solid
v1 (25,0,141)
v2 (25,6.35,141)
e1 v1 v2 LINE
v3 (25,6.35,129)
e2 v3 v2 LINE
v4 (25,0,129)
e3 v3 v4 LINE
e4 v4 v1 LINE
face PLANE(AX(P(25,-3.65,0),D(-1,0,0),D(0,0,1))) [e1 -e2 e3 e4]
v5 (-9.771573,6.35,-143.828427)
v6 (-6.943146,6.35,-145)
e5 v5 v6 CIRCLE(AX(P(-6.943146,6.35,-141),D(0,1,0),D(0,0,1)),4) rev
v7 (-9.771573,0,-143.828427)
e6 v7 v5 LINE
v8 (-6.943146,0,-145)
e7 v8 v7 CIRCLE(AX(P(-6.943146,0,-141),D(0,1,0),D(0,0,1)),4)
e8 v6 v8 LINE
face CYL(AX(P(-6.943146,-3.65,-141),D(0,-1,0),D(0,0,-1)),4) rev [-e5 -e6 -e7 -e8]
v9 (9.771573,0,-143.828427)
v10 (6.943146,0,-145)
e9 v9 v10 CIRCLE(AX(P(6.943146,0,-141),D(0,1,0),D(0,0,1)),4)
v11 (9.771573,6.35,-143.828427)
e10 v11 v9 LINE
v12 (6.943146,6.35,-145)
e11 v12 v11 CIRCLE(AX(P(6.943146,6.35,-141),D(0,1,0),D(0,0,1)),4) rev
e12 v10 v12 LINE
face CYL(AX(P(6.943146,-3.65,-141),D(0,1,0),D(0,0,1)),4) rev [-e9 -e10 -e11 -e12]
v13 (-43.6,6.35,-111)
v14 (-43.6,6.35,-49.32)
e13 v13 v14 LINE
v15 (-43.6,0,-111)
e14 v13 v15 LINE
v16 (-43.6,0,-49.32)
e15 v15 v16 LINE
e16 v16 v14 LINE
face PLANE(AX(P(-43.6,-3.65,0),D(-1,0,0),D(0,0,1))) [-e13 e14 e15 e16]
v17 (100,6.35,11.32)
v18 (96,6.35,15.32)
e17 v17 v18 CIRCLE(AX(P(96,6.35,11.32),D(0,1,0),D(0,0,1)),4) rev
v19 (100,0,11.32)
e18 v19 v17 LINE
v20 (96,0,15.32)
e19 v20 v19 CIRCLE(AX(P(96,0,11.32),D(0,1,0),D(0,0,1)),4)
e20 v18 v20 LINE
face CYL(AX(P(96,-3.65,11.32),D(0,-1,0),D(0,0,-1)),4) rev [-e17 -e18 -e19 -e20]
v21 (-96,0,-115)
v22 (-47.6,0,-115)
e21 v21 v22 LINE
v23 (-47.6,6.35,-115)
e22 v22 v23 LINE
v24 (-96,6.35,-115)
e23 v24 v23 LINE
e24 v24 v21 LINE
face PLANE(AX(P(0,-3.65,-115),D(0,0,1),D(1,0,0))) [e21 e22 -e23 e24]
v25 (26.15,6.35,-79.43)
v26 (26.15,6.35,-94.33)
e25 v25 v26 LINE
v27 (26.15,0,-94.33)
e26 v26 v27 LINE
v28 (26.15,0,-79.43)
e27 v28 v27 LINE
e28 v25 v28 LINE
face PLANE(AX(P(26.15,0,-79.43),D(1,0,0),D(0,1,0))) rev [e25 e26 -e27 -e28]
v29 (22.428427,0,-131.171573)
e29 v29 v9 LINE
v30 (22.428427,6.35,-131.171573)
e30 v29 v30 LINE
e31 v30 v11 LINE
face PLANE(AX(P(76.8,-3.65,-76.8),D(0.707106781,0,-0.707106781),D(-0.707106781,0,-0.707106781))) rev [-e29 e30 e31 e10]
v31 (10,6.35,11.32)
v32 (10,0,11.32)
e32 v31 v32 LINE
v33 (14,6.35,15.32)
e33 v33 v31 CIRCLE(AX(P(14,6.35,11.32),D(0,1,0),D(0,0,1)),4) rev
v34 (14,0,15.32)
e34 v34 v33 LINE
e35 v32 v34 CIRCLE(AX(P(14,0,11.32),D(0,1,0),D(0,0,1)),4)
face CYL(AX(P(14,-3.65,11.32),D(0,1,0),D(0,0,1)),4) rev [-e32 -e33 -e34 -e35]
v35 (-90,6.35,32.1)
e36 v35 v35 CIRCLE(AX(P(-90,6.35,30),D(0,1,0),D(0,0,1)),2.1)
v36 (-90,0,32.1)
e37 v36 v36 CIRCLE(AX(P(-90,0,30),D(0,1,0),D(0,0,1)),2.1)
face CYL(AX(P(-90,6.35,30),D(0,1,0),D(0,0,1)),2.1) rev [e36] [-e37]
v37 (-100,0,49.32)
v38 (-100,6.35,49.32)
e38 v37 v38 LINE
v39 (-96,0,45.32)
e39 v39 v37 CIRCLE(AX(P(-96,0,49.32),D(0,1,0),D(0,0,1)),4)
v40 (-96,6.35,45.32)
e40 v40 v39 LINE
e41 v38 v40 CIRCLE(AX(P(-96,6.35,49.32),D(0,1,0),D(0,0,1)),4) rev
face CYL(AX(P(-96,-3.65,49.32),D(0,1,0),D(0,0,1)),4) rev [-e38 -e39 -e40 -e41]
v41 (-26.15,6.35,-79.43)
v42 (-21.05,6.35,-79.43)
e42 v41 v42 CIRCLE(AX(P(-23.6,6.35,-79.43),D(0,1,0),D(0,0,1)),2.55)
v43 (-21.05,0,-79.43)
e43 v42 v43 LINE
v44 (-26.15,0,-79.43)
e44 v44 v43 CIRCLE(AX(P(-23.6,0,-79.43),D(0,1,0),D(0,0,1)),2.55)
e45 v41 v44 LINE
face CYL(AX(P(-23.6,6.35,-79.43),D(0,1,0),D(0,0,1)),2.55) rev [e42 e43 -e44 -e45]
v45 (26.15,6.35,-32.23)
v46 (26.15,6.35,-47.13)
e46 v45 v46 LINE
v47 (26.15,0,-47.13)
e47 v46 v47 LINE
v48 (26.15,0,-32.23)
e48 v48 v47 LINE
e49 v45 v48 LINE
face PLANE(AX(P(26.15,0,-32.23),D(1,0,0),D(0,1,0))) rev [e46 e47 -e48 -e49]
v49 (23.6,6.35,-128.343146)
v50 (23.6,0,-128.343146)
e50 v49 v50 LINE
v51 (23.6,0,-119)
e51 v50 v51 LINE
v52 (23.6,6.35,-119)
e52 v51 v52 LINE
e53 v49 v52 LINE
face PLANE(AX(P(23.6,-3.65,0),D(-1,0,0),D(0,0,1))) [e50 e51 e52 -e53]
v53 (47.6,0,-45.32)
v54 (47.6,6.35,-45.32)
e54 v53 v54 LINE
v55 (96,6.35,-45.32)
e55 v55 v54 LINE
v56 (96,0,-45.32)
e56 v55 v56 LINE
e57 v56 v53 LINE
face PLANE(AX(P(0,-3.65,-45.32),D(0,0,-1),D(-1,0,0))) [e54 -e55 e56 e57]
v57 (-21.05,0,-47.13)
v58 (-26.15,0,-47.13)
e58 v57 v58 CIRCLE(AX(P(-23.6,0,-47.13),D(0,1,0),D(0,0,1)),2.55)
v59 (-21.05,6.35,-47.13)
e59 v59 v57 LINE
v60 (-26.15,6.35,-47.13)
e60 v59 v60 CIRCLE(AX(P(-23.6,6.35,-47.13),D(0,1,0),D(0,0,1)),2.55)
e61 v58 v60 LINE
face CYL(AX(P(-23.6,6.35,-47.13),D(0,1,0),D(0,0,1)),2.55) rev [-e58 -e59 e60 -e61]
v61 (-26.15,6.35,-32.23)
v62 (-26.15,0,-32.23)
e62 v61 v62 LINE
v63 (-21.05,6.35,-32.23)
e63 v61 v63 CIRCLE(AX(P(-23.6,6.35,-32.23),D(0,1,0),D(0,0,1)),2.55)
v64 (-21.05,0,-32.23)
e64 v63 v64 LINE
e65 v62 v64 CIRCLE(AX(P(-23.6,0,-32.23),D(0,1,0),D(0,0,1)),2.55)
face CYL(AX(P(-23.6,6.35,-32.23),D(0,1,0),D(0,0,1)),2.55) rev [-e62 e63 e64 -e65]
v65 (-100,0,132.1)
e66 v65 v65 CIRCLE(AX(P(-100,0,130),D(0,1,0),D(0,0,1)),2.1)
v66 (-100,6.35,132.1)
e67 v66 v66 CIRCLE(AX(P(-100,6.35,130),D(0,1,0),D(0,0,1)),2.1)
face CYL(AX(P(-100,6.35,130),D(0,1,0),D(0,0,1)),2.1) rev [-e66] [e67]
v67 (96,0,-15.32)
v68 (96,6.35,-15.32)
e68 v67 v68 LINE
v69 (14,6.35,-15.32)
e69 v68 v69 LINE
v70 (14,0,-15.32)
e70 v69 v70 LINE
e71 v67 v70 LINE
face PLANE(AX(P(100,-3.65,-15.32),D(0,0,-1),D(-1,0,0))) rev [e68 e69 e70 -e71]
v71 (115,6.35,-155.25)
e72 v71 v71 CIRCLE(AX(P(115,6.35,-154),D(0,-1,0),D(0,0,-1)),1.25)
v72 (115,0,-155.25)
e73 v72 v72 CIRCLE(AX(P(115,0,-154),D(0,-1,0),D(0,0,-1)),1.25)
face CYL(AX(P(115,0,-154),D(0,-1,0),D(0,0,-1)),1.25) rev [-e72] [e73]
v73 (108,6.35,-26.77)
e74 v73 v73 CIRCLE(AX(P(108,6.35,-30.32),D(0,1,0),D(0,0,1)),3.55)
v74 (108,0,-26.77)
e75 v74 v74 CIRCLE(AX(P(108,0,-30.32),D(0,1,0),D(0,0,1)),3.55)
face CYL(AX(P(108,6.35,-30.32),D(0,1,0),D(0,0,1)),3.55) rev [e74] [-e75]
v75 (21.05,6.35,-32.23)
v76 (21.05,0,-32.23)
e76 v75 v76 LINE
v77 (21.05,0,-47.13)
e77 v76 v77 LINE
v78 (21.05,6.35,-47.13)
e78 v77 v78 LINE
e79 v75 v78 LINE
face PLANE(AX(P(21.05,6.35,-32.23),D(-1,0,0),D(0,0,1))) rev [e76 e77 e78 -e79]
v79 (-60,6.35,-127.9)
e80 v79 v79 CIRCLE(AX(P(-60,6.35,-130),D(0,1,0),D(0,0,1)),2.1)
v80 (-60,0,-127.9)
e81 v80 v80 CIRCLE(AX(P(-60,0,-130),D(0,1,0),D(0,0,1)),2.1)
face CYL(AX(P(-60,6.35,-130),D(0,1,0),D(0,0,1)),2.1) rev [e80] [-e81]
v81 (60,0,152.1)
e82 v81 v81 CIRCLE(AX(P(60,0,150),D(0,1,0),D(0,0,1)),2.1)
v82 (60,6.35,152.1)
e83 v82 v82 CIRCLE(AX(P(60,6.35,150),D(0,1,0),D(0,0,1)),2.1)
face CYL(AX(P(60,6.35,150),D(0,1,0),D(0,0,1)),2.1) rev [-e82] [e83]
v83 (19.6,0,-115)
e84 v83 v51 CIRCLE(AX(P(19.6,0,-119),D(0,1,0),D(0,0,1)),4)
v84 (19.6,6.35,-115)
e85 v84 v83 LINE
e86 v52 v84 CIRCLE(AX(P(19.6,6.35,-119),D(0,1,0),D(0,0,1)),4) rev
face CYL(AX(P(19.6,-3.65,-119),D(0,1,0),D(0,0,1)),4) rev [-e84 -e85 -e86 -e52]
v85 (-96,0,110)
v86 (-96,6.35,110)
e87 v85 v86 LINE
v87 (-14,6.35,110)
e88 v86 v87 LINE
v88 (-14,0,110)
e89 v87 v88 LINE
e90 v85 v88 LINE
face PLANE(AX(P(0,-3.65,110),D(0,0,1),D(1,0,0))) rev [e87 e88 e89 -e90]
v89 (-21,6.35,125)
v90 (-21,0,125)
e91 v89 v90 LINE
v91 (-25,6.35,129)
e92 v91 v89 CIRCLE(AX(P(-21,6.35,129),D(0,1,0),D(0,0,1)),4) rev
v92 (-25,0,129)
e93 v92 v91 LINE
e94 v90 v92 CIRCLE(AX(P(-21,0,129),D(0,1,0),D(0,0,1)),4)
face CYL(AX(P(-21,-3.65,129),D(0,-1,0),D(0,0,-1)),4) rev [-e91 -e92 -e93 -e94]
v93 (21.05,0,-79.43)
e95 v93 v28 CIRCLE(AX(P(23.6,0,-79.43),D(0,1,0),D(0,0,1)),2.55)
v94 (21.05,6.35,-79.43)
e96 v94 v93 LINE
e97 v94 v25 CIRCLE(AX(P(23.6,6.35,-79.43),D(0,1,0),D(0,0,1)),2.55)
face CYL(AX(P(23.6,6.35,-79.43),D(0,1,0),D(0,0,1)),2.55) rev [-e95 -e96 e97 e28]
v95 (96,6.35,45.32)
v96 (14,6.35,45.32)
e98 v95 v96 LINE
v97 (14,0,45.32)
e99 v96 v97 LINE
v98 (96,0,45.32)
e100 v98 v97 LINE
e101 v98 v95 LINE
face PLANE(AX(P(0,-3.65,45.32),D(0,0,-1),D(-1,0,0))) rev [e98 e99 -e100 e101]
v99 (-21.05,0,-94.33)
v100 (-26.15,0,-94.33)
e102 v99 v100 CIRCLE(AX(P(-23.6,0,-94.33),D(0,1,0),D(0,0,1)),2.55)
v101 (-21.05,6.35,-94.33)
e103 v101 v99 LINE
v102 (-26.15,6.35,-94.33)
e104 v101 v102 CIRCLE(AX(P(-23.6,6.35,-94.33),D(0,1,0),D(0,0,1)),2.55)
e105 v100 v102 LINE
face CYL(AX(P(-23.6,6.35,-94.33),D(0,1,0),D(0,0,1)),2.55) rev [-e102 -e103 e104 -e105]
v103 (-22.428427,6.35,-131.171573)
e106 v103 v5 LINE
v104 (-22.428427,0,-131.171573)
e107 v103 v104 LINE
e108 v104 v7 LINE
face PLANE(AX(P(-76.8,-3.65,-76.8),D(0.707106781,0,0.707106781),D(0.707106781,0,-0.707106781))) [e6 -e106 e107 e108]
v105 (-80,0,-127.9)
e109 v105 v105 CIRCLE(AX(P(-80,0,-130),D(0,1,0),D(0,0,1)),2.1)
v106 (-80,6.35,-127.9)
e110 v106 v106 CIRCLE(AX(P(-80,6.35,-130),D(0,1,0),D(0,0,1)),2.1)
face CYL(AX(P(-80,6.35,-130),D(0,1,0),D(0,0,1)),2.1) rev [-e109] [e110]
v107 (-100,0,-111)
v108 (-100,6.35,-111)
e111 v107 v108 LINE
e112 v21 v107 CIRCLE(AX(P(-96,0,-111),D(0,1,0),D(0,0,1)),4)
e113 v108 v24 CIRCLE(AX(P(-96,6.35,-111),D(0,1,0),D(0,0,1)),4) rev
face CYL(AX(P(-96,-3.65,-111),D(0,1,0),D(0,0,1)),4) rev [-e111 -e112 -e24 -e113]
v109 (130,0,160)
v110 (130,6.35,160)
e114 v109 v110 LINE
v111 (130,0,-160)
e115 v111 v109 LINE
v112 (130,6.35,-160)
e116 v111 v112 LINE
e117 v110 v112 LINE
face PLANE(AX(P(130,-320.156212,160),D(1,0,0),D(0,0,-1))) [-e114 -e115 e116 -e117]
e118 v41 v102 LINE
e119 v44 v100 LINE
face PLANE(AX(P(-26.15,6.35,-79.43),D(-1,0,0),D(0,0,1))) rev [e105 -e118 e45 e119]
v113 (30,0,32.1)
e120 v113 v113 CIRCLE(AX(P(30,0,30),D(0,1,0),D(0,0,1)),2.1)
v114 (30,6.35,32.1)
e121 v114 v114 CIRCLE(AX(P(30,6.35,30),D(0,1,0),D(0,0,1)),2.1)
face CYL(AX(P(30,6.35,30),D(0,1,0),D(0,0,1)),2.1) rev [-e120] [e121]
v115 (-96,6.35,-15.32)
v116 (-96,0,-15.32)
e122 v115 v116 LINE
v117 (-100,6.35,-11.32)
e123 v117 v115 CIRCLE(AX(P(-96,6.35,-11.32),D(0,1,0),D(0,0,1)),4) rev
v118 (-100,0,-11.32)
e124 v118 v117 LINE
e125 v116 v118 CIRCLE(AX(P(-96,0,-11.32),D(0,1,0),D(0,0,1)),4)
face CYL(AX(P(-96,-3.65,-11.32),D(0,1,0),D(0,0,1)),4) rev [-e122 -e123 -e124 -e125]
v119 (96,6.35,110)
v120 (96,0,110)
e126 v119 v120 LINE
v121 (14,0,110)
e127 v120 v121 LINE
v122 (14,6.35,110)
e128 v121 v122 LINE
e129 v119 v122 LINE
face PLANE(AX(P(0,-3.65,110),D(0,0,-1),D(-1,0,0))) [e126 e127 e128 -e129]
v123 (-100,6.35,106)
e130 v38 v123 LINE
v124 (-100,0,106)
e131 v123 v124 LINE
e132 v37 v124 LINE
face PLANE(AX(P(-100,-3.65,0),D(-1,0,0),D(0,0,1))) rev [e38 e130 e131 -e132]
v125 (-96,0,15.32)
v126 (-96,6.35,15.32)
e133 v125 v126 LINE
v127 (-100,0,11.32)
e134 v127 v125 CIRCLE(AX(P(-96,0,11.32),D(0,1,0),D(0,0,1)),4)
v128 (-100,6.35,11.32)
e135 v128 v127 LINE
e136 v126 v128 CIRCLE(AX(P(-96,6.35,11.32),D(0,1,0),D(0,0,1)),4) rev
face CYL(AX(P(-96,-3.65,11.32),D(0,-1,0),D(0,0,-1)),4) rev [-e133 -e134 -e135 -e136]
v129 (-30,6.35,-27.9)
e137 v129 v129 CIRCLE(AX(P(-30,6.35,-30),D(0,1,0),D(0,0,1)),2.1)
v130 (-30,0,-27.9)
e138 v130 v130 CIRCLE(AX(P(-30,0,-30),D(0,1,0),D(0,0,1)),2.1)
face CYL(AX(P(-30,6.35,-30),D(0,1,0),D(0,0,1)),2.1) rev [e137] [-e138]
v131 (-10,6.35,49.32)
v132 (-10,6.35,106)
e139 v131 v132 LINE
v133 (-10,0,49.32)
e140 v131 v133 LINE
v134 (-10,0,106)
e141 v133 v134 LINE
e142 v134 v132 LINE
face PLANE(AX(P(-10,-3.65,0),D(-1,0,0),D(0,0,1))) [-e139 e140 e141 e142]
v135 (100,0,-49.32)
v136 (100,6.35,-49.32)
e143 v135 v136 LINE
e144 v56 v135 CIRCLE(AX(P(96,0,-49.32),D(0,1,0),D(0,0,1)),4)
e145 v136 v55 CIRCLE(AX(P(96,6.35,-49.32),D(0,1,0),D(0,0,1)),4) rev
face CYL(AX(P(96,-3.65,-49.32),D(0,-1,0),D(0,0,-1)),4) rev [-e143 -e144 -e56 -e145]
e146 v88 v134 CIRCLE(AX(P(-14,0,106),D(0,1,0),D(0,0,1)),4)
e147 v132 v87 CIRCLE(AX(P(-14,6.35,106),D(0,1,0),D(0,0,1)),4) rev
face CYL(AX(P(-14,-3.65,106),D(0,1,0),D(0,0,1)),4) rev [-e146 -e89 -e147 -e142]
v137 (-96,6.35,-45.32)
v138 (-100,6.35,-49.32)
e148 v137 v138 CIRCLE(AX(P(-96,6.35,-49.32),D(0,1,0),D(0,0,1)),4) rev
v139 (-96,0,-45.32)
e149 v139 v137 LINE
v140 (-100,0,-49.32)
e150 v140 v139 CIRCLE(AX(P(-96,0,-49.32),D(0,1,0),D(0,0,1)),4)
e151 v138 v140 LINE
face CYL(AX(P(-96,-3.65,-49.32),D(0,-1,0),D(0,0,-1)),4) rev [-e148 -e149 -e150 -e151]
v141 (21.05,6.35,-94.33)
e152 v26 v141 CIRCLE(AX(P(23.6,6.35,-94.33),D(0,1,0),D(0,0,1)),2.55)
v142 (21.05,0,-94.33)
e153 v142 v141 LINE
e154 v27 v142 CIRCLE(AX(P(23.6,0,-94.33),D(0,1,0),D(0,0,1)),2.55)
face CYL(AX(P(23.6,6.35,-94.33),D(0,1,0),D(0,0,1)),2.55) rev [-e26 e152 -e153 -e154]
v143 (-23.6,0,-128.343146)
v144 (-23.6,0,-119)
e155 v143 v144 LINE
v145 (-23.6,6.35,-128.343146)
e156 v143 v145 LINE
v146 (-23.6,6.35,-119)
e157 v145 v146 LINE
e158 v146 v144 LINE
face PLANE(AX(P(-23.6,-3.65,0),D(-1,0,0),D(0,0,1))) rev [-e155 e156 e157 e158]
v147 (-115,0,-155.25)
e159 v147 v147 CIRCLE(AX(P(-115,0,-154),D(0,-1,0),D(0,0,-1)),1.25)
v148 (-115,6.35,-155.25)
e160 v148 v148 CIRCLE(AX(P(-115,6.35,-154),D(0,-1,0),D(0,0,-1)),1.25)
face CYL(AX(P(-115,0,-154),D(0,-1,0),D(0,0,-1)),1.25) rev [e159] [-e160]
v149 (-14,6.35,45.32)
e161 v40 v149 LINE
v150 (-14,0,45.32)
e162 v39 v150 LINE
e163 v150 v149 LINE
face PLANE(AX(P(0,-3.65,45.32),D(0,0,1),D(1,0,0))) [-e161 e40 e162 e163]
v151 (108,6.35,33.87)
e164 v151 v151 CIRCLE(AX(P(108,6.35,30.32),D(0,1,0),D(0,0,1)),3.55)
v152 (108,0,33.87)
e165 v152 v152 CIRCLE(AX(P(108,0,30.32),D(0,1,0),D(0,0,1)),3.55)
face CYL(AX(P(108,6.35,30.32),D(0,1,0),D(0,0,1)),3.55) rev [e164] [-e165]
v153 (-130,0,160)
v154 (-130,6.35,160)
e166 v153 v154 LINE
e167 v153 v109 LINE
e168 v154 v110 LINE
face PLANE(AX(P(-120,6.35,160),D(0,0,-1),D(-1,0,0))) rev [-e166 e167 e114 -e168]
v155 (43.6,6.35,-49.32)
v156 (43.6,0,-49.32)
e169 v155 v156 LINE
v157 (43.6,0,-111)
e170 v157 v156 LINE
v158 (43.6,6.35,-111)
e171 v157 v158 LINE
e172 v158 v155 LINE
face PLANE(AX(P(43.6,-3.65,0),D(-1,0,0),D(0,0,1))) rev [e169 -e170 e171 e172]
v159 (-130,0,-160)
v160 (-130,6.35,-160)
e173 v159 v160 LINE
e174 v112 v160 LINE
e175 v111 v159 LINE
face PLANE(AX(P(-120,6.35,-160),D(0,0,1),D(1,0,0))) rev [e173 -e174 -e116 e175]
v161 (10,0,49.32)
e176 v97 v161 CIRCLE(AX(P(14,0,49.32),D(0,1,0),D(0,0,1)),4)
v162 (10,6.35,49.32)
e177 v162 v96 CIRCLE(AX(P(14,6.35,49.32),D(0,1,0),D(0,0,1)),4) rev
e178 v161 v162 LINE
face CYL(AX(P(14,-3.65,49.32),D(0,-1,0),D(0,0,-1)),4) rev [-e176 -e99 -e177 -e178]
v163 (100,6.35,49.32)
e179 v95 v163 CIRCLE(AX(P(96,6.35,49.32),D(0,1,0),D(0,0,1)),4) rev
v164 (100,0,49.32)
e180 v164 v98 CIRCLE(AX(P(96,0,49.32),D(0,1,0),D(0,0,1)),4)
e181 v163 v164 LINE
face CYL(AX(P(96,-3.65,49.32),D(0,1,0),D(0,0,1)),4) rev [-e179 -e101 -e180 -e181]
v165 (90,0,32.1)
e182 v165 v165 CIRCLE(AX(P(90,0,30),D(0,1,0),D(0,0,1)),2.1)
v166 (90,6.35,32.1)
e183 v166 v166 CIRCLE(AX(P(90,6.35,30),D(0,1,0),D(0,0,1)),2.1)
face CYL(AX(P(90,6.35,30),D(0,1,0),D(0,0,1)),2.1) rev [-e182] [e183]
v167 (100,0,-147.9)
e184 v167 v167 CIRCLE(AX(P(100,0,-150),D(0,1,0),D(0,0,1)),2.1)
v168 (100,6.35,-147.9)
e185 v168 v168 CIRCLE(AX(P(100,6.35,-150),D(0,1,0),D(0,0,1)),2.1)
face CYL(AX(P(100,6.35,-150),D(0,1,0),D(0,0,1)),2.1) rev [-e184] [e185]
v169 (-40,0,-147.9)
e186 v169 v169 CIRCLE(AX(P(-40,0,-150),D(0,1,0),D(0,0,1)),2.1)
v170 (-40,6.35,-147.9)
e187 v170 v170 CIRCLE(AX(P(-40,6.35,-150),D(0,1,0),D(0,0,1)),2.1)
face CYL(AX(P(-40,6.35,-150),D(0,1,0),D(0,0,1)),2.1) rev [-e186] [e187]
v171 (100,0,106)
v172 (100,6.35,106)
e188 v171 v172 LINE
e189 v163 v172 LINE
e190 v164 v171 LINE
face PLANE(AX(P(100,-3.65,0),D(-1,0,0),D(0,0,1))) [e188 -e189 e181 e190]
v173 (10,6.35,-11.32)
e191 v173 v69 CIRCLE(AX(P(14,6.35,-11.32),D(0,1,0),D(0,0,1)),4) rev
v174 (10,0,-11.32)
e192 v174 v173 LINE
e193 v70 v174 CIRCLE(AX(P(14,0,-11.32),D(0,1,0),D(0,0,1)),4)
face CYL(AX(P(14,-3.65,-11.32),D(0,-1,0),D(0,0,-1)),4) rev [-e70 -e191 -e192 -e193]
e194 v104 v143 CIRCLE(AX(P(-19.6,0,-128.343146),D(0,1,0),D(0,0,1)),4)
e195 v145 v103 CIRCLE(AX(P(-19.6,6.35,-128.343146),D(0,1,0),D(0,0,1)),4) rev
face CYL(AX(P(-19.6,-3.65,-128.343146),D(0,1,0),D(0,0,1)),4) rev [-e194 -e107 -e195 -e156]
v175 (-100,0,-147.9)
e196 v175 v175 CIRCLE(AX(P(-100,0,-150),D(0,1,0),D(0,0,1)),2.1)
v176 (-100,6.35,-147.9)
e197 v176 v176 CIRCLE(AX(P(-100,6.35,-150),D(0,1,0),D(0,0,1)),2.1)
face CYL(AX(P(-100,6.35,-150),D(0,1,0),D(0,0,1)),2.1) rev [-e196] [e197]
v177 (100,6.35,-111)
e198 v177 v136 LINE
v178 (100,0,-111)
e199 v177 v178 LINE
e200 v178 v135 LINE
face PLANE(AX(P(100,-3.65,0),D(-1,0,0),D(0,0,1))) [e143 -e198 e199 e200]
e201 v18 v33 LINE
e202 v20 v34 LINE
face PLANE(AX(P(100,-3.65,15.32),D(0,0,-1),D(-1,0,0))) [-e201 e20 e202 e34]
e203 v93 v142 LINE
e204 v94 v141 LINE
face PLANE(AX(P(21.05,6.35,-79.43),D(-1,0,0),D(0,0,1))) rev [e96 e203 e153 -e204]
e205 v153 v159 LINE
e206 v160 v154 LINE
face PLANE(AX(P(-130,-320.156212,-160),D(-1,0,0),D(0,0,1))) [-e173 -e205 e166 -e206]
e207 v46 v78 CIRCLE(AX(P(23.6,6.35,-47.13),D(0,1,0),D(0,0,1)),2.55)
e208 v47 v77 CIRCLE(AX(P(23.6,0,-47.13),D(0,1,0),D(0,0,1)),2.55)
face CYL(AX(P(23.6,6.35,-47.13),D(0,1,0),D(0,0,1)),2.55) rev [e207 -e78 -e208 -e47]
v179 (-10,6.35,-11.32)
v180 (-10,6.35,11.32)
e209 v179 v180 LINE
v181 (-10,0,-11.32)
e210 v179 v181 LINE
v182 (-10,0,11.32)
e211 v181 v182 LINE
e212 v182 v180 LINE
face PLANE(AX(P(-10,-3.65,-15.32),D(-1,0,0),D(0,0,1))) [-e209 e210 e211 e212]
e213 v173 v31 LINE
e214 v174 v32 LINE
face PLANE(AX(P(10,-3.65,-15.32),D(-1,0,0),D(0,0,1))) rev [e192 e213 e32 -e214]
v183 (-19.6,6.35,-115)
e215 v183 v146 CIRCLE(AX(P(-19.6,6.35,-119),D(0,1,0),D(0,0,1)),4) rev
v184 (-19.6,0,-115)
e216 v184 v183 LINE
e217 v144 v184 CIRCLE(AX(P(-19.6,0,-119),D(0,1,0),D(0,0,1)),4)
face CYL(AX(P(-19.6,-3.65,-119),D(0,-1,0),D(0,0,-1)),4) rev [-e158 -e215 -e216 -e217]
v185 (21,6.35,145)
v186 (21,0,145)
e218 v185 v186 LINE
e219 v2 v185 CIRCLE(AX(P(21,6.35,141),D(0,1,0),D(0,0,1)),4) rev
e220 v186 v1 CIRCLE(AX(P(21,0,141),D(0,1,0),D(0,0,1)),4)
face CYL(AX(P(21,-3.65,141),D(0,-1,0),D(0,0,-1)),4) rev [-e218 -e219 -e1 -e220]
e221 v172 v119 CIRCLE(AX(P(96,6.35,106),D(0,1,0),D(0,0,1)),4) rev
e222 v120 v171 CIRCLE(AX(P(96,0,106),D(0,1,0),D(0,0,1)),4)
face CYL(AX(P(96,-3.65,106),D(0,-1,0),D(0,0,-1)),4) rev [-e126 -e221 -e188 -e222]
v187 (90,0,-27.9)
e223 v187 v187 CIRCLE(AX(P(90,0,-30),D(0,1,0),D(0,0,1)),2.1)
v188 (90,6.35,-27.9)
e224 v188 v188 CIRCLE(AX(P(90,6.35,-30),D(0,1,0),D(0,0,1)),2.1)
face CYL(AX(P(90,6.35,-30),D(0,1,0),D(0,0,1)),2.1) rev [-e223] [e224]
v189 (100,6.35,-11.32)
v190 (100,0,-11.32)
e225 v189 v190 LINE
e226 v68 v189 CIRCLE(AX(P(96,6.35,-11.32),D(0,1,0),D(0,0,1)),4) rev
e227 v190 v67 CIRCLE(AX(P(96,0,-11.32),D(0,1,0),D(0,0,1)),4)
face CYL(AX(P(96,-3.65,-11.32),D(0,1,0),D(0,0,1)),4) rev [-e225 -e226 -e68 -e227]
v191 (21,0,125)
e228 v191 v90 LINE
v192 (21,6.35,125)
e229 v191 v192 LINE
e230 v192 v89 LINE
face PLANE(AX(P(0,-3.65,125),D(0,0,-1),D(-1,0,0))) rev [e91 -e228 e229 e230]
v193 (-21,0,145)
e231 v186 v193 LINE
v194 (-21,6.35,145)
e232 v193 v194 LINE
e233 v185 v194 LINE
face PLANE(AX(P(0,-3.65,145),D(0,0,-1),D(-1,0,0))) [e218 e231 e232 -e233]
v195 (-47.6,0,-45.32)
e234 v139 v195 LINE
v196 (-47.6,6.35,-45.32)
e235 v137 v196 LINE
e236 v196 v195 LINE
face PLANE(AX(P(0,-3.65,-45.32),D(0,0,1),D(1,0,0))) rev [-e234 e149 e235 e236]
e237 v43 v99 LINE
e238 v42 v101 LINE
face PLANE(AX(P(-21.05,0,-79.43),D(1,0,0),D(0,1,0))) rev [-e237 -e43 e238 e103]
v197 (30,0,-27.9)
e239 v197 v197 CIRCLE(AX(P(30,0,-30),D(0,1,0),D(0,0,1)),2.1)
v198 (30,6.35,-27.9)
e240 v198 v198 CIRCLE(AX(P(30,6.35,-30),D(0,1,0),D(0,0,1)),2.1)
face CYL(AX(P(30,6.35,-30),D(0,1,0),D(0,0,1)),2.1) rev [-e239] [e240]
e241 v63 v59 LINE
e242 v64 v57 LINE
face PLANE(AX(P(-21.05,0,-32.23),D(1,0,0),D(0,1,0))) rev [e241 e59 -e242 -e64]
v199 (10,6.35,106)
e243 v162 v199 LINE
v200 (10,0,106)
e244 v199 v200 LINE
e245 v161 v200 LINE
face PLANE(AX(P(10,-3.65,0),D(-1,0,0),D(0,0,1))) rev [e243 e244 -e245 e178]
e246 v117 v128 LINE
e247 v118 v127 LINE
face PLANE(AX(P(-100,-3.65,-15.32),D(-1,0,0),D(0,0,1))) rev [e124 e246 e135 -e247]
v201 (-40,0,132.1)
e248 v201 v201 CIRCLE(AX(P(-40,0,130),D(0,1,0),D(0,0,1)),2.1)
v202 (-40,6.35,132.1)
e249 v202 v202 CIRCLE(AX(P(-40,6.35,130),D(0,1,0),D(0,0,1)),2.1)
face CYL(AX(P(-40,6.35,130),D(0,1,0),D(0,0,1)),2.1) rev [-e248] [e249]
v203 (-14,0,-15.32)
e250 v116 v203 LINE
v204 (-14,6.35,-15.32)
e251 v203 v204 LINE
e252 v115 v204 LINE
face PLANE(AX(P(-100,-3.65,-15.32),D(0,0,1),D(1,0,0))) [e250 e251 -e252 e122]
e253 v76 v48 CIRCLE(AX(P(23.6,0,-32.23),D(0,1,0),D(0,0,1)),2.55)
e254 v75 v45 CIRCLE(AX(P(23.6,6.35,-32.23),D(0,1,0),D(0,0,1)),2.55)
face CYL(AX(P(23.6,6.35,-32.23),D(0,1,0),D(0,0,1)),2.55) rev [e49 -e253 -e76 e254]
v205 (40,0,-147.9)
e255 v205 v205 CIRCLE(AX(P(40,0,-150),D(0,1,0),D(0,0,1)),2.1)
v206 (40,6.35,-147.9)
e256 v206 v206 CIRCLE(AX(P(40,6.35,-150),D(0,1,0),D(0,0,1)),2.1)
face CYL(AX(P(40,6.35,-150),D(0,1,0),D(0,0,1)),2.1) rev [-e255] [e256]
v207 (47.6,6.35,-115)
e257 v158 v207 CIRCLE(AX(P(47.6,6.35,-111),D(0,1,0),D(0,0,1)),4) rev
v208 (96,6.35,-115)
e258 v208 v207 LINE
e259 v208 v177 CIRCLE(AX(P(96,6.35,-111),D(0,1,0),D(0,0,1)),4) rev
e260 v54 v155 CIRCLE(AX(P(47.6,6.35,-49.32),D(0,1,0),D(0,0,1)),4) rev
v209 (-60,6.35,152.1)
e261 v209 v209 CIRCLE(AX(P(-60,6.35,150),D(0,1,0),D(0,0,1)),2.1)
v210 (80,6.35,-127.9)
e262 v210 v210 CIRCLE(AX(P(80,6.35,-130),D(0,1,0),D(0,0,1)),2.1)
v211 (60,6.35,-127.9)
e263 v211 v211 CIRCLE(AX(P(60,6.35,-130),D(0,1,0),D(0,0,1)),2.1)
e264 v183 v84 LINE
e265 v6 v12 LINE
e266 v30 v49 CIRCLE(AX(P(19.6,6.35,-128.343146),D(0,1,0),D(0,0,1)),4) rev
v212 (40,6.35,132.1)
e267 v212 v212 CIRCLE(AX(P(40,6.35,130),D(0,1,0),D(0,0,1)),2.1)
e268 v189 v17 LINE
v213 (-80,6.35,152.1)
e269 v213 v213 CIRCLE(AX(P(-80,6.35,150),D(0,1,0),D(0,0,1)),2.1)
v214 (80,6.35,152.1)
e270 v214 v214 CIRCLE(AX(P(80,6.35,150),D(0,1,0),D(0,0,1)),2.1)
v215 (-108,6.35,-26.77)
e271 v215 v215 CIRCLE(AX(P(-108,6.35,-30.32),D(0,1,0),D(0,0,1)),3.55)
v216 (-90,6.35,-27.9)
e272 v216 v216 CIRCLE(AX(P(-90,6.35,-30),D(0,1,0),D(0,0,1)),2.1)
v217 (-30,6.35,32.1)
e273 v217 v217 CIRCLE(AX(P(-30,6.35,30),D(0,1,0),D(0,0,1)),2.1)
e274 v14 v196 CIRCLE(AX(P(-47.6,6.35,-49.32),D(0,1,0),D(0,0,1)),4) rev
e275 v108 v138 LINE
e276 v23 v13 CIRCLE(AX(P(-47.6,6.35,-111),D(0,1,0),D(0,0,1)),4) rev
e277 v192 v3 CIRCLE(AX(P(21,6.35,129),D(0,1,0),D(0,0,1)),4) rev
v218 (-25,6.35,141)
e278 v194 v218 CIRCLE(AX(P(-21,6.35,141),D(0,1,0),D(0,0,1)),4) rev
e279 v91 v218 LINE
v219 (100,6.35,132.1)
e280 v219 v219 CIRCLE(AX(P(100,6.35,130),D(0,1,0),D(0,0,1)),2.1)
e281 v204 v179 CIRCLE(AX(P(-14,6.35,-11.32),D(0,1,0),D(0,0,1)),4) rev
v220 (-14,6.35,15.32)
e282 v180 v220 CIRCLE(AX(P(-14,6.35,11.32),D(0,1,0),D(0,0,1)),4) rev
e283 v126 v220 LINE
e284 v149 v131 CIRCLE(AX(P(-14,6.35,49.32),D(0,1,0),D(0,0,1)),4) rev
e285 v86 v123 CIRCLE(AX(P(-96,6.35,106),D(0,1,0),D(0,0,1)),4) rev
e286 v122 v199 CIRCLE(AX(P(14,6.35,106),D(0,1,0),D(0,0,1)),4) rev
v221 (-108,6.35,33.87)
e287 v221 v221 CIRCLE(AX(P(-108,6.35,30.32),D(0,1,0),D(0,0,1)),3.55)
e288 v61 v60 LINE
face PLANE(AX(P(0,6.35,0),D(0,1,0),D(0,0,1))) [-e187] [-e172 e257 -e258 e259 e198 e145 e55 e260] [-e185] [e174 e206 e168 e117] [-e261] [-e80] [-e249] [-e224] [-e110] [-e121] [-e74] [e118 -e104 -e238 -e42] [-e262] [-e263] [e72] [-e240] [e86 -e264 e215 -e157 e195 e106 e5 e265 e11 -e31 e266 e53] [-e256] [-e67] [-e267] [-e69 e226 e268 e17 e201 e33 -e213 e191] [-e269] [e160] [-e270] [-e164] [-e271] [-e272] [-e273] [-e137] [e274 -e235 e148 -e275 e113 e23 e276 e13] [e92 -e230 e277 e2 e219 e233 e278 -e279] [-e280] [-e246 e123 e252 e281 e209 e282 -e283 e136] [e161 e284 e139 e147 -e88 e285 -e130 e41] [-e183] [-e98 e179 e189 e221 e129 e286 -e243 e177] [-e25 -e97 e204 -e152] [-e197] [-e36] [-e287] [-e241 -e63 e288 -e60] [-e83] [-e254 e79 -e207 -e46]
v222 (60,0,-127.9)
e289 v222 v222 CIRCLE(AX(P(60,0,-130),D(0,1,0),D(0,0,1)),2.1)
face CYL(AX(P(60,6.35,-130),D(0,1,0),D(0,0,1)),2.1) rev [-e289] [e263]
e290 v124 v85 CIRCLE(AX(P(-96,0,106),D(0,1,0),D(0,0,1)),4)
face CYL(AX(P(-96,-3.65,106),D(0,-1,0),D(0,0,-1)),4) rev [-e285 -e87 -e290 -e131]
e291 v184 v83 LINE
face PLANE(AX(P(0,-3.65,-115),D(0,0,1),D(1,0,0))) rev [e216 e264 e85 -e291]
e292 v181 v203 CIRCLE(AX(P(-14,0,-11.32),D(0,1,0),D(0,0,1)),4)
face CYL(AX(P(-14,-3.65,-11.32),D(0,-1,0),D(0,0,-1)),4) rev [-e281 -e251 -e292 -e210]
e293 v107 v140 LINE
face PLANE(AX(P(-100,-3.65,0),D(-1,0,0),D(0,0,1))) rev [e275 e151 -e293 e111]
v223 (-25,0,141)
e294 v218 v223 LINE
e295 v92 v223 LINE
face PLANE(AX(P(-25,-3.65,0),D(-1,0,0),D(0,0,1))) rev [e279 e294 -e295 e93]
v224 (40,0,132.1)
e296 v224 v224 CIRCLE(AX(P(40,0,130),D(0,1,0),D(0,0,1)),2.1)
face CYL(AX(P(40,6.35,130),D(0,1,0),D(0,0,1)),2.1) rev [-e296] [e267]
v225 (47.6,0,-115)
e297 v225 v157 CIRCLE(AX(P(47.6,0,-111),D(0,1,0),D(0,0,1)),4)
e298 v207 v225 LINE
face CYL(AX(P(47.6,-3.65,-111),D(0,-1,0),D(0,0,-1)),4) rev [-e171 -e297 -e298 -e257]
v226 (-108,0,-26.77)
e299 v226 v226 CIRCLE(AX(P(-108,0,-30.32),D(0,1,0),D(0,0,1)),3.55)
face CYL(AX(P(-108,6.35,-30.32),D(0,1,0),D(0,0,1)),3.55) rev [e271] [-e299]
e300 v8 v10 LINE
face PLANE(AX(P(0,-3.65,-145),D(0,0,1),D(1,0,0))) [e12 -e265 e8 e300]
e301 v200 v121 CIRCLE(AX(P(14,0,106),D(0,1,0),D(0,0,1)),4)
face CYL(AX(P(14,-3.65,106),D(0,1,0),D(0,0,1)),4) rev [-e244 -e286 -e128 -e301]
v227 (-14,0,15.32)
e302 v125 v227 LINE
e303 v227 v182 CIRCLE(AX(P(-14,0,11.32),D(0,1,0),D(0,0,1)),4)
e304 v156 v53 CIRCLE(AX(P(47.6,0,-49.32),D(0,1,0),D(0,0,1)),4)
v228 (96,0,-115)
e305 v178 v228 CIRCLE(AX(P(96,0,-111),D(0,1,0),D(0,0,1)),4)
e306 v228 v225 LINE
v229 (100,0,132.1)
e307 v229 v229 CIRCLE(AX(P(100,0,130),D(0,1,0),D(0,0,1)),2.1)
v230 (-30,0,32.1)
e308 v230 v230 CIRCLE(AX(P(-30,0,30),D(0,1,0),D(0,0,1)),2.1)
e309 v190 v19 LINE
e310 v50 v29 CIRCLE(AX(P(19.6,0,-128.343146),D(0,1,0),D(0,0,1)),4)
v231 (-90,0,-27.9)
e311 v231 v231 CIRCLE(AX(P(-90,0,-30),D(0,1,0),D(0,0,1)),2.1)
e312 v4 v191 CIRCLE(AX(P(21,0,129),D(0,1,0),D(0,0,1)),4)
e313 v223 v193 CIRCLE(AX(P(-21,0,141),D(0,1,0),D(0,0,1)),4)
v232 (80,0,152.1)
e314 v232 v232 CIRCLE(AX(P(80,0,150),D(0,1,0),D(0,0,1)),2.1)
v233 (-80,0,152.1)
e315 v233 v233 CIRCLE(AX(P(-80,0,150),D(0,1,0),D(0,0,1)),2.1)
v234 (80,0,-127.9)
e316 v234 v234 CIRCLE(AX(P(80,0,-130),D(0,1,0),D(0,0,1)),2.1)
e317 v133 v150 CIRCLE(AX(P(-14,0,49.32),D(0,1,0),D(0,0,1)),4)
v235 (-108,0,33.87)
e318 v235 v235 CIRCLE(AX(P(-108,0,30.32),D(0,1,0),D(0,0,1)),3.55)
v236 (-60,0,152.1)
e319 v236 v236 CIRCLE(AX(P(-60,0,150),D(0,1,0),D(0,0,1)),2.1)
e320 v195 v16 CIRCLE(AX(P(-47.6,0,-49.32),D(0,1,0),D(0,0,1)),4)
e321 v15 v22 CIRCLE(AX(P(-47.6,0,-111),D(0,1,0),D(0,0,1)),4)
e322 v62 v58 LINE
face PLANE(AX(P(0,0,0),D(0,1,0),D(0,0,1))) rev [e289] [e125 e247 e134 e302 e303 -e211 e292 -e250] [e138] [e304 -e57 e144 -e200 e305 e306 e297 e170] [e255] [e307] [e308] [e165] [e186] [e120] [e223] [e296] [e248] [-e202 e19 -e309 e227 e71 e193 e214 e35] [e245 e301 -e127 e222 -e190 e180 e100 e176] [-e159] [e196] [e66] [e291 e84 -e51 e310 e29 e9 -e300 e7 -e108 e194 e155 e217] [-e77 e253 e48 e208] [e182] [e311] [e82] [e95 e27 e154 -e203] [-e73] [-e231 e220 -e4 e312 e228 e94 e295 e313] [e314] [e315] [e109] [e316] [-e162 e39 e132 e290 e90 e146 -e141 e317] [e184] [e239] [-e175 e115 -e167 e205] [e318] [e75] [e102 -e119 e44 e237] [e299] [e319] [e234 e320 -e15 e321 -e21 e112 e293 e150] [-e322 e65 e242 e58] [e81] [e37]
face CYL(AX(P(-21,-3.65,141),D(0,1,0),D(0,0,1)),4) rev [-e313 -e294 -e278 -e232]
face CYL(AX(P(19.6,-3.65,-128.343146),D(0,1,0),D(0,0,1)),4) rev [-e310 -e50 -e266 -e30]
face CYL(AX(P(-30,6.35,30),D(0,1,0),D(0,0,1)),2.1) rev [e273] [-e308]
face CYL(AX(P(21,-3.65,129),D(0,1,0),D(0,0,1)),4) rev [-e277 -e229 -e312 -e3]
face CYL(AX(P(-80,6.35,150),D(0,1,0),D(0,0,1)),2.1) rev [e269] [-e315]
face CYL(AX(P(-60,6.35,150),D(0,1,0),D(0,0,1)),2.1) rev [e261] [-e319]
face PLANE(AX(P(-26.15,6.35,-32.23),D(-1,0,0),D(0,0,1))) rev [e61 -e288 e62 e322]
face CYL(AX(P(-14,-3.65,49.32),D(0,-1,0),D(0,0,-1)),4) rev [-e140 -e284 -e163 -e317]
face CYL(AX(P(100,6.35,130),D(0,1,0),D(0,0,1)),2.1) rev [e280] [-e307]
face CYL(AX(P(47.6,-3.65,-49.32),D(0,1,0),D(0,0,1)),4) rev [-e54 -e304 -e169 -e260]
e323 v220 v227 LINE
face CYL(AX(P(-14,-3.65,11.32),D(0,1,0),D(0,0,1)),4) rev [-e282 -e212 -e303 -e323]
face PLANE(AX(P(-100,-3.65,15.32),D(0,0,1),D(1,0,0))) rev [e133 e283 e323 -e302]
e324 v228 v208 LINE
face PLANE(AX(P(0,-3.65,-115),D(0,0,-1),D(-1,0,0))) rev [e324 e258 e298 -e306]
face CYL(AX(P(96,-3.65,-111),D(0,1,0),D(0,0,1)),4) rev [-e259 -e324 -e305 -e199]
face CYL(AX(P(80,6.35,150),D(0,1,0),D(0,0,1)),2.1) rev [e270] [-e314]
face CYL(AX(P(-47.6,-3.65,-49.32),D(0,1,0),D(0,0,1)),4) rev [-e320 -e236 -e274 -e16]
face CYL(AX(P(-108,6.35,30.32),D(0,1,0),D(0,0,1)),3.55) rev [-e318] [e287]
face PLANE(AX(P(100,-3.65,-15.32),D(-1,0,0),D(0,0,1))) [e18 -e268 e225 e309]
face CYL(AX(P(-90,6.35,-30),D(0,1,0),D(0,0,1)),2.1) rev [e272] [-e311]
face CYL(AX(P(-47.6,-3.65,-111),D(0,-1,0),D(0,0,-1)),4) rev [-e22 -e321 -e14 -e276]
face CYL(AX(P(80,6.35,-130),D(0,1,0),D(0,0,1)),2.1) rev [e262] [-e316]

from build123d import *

# Parameters (mm, degrees)
SKETCH1_W                           = 240
SKETCH1_H                           = 320
BOSS_EXTRUDE1_DEPTH                 = 6.35
F_7_1_7_1_DIAMETER_HOLE1_D          = 7.1
M5X0_8_TAPPED_HOLE1_D               = 4.2
M5X0_8_TAPPED_HOLE3_D               = 4.2
F_5_0MM_CLEARANCE_DOWEL_SLOT1_DEPTH = 6.35
SKETCH12_W                          = 25
SKETCH12_H                          = 20
SKETCH12_W_2                        = 90
SKETCH12_H_2                        = 64.68
SKETCH12_W_3                        = 56.4
SKETCH12_H_3                        = 69.68
SKETCH12_W_4                        = 23.6
SKETCH12_H_4                        = 15
SKETCH12_H_5                        = 30.64
CUT_EXTRUDE1_DEPTH                  = 10
FILLET1_R                           = 4
FILLET1_OF_MIRROR1_R                = 4
SKETCH13_W                          = 10
SKETCH13_H                          = 320
BOSS_EXTRUDE2_DEPTH                 = 6.35
M3X0_5_TAPPED_HOLE1_D               = 2.5


# Read off the part's stored shape, not the designer's step: Ø5.0mm Clearance Dowel Slot1
with BuildPart() as part:
    # Sketch1 → Boss-Extrude1 (new body)
    with BuildSketch(Plane(origin=(0, 0, 0), x_dir=(1, 0, 0), z_dir=(0, 1, 0))):
        Rectangle(SKETCH1_W, SKETCH1_H)
    extrude(amount=BOSS_EXTRUDE1_DEPTH)

    # Ø7.1 (7.1) Diameter Hole1 (through all)
    with Locations(Plane(origin=(0, 6.35, 0), x_dir=(1, 0, 0), z_dir=(0, 1, 0))):
        with Locations((-108, 30.32), (108, 30.32), (108, -30.32), (-108, -30.32)):
            Hole(F_7_1_7_1_DIAMETER_HOLE1_D / 2)

    # M5x0.8 Tapped Hole1 (through all)
    with Locations(Plane(origin=(0, 6.35, 0), x_dir=(1, 0, 0), z_dir=(0, 1, 0))):
        with Locations((-90, 30), (-30, 30), (30, 30), (90, 30), (-90, -30), (-30, -30), (30, -30), (90, -30)):
            Hole(M5X0_8_TAPPED_HOLE1_D / 2)

    # M5x0.8 Tapped Hole3 (through all)
    with Locations(Plane(origin=(0, 6.35, 0), x_dir=(1, 0, 0), z_dir=(0, 1, 0))):
        with Locations((-80, -150), (-60, -150), (-40, -130), (-100, -130), (-100, 150), (-80, 130), (-60, 130), (-40, 150), (40, 150), (60, 130), (80, 130), (100, 150), (40, -130), (100, -130), (60, -150), (80, -150)):
            Hole(M5X0_8_TAPPED_HOLE3_D / 2)

    # Ø5.0mm Clearance Dowel Slot1 outline → Ø5.0mm Clearance Dowel Slot1 (cut)
    with BuildSketch(Plane(origin=(0, 0, 0), x_dir=(1, 0, 0), z_dir=(0, 1, 0))):
        with BuildLine():
            Line((26.15, 32.23), (26.15, 47.13))
            ThreePointArc((26.15, 47.13), (23.6, 49.68), (21.05, 47.13))
            Line((21.05, 47.13), (21.05, 32.23))
            ThreePointArc((21.05, 32.23), (23.6, 29.68), (26.15, 32.23))
        make_face()
        with BuildLine():
            ThreePointArc((26.15, 94.33), (23.6, 96.88), (21.05, 94.33))
            Line((21.05, 94.33), (21.05, 79.43))
            ThreePointArc((21.05, 79.43), (23.6, 76.88), (26.15, 79.43))
            Line((26.15, 79.43), (26.15, 94.33))
        make_face()
        with BuildLine():
            Line((-21.05, 32.23), (-21.05, 47.13))
            ThreePointArc((-21.05, 47.13), (-23.6, 49.68), (-26.15, 47.13))
            Line((-26.15, 47.13), (-26.15, 32.23))
            ThreePointArc((-26.15, 32.23), (-23.6, 29.68), (-21.05, 32.23))
        make_face()
        with BuildLine():
            ThreePointArc((-21.05, 94.33), (-23.6, 96.88), (-26.15, 94.33))
            Line((-26.15, 94.33), (-26.15, 79.43))
            ThreePointArc((-26.15, 79.43), (-23.6, 76.88), (-21.05, 79.43))
            Line((-21.05, 79.43), (-21.05, 94.33))
        make_face()
    extrude(amount=F_5_0MM_CLEARANCE_DOWEL_SLOT1_DEPTH, mode=Mode.SUBTRACT)

    # Sketch12 → Cut-Extrude1 (cut)
    with BuildSketch(Plane(origin=(0, 6.35, 0), x_dir=(1, 0, 0), z_dir=(0, 1, 0))):
        with Locations((-12.5, -135)):
            Rectangle(SKETCH12_W, SKETCH12_H)
        with Locations((-55, -77.66)):
            Rectangle(SKETCH12_W_2, SKETCH12_H_2)
        with Locations((-71.8, 80.16)):
            Rectangle(SKETCH12_W_3, SKETCH12_H_3)
        with Locations((-11.8, 122.5)):
            Rectangle(SKETCH12_W_4, SKETCH12_H_4)
        Polygon((0, 130), (-23.6, 130), (-8.6, 145), (0, 145), align=None)
        with Locations((-55, 0)):
            Rectangle(SKETCH12_W_2, SKETCH12_H_5)
    cut_extrude1 = extrude(amount=-CUT_EXTRUDE1_DEPTH, mode=Mode.SUBTRACT)

    # Fillet1
    fillet1_edges = [part.edges().sort_by_distance(p)[0] for p in [
        (-25, 3.175, 125),
        (-25, 3.175, 145),
        (-10, 3.175, 45.32),
        (-10, 3.175, 110),
        (-100, 3.175, 110),
        (-100, 3.175, 45.32),
        (-43.6, 3.175, -115),
        (-43.6, 3.175, -45.32),
        (-100, 3.175, -45.32),
        (-100, 3.175, -115),
        (-23.6, 3.175, -115),
        (-23.6, 3.175, -130),
        (-8.6, 3.175, -145),
        (-100, 3.175, 15.32),
        (-100, 3.175, -15.32),
        (-10, 3.175, -15.32),
        (-10, 3.175, 15.32),
    ]]
    fillet(fillet1_edges, radius=FILLET1_R)

    # Mirror1: Cut-Extrude1 across plane
    add(cut_extrude1.mirror(Plane.ZY), mode=Mode.SUBTRACT)

    # Fillet1 of Mirror1
    fillet1_of_mirror1_edges = [part.edges().sort_by_distance(p)[0] for p in [
        (25, 3.175, 125),
        (25, 3.175, 145),
        (10, 3.175, 45.32),
        (10, 3.175, 110),
        (100, 3.175, 110),
        (100, 3.175, 45.32),
        (43.6, 3.175, -115),
        (43.6, 3.175, -45.32),
        (100, 3.175, -45.32),
        (100, 3.175, -115),
        (23.6, 3.175, -115),
        (23.6, 3.175, -130),
        (8.6, 3.175, -145),
        (100, 3.175, 15.32),
        (100, 3.175, -15.32),
        (10, 3.175, -15.32),
        (10, 3.175, 15.32),
    ]]
    fillet(fillet1_of_mirror1_edges, radius=FILLET1_OF_MIRROR1_R)

    # Sketch13 → Boss-Extrude2 (add)
    with BuildSketch(Plane(origin=(0, 6.35, 0), x_dir=(1, 0, 0), z_dir=(0, 1, 0))):
        with Locations((-125, 0)):
            Rectangle(SKETCH13_W, SKETCH13_H)
        with Locations((125, 0)):
            Rectangle(SKETCH13_W, SKETCH13_H)
    extrude(amount=-BOSS_EXTRUDE2_DEPTH)

    # M3x0.5 Tapped Hole1 (through all)
    with Locations(Plane(origin=(0, 0, 0), x_dir=(-1, 0, 0), z_dir=(0, -1, 0))):
        with Locations((-115, 154), (115, 154)):
            Hole(M3X0_5_TAPPED_HOLE1_D / 2)


solid = part.part
